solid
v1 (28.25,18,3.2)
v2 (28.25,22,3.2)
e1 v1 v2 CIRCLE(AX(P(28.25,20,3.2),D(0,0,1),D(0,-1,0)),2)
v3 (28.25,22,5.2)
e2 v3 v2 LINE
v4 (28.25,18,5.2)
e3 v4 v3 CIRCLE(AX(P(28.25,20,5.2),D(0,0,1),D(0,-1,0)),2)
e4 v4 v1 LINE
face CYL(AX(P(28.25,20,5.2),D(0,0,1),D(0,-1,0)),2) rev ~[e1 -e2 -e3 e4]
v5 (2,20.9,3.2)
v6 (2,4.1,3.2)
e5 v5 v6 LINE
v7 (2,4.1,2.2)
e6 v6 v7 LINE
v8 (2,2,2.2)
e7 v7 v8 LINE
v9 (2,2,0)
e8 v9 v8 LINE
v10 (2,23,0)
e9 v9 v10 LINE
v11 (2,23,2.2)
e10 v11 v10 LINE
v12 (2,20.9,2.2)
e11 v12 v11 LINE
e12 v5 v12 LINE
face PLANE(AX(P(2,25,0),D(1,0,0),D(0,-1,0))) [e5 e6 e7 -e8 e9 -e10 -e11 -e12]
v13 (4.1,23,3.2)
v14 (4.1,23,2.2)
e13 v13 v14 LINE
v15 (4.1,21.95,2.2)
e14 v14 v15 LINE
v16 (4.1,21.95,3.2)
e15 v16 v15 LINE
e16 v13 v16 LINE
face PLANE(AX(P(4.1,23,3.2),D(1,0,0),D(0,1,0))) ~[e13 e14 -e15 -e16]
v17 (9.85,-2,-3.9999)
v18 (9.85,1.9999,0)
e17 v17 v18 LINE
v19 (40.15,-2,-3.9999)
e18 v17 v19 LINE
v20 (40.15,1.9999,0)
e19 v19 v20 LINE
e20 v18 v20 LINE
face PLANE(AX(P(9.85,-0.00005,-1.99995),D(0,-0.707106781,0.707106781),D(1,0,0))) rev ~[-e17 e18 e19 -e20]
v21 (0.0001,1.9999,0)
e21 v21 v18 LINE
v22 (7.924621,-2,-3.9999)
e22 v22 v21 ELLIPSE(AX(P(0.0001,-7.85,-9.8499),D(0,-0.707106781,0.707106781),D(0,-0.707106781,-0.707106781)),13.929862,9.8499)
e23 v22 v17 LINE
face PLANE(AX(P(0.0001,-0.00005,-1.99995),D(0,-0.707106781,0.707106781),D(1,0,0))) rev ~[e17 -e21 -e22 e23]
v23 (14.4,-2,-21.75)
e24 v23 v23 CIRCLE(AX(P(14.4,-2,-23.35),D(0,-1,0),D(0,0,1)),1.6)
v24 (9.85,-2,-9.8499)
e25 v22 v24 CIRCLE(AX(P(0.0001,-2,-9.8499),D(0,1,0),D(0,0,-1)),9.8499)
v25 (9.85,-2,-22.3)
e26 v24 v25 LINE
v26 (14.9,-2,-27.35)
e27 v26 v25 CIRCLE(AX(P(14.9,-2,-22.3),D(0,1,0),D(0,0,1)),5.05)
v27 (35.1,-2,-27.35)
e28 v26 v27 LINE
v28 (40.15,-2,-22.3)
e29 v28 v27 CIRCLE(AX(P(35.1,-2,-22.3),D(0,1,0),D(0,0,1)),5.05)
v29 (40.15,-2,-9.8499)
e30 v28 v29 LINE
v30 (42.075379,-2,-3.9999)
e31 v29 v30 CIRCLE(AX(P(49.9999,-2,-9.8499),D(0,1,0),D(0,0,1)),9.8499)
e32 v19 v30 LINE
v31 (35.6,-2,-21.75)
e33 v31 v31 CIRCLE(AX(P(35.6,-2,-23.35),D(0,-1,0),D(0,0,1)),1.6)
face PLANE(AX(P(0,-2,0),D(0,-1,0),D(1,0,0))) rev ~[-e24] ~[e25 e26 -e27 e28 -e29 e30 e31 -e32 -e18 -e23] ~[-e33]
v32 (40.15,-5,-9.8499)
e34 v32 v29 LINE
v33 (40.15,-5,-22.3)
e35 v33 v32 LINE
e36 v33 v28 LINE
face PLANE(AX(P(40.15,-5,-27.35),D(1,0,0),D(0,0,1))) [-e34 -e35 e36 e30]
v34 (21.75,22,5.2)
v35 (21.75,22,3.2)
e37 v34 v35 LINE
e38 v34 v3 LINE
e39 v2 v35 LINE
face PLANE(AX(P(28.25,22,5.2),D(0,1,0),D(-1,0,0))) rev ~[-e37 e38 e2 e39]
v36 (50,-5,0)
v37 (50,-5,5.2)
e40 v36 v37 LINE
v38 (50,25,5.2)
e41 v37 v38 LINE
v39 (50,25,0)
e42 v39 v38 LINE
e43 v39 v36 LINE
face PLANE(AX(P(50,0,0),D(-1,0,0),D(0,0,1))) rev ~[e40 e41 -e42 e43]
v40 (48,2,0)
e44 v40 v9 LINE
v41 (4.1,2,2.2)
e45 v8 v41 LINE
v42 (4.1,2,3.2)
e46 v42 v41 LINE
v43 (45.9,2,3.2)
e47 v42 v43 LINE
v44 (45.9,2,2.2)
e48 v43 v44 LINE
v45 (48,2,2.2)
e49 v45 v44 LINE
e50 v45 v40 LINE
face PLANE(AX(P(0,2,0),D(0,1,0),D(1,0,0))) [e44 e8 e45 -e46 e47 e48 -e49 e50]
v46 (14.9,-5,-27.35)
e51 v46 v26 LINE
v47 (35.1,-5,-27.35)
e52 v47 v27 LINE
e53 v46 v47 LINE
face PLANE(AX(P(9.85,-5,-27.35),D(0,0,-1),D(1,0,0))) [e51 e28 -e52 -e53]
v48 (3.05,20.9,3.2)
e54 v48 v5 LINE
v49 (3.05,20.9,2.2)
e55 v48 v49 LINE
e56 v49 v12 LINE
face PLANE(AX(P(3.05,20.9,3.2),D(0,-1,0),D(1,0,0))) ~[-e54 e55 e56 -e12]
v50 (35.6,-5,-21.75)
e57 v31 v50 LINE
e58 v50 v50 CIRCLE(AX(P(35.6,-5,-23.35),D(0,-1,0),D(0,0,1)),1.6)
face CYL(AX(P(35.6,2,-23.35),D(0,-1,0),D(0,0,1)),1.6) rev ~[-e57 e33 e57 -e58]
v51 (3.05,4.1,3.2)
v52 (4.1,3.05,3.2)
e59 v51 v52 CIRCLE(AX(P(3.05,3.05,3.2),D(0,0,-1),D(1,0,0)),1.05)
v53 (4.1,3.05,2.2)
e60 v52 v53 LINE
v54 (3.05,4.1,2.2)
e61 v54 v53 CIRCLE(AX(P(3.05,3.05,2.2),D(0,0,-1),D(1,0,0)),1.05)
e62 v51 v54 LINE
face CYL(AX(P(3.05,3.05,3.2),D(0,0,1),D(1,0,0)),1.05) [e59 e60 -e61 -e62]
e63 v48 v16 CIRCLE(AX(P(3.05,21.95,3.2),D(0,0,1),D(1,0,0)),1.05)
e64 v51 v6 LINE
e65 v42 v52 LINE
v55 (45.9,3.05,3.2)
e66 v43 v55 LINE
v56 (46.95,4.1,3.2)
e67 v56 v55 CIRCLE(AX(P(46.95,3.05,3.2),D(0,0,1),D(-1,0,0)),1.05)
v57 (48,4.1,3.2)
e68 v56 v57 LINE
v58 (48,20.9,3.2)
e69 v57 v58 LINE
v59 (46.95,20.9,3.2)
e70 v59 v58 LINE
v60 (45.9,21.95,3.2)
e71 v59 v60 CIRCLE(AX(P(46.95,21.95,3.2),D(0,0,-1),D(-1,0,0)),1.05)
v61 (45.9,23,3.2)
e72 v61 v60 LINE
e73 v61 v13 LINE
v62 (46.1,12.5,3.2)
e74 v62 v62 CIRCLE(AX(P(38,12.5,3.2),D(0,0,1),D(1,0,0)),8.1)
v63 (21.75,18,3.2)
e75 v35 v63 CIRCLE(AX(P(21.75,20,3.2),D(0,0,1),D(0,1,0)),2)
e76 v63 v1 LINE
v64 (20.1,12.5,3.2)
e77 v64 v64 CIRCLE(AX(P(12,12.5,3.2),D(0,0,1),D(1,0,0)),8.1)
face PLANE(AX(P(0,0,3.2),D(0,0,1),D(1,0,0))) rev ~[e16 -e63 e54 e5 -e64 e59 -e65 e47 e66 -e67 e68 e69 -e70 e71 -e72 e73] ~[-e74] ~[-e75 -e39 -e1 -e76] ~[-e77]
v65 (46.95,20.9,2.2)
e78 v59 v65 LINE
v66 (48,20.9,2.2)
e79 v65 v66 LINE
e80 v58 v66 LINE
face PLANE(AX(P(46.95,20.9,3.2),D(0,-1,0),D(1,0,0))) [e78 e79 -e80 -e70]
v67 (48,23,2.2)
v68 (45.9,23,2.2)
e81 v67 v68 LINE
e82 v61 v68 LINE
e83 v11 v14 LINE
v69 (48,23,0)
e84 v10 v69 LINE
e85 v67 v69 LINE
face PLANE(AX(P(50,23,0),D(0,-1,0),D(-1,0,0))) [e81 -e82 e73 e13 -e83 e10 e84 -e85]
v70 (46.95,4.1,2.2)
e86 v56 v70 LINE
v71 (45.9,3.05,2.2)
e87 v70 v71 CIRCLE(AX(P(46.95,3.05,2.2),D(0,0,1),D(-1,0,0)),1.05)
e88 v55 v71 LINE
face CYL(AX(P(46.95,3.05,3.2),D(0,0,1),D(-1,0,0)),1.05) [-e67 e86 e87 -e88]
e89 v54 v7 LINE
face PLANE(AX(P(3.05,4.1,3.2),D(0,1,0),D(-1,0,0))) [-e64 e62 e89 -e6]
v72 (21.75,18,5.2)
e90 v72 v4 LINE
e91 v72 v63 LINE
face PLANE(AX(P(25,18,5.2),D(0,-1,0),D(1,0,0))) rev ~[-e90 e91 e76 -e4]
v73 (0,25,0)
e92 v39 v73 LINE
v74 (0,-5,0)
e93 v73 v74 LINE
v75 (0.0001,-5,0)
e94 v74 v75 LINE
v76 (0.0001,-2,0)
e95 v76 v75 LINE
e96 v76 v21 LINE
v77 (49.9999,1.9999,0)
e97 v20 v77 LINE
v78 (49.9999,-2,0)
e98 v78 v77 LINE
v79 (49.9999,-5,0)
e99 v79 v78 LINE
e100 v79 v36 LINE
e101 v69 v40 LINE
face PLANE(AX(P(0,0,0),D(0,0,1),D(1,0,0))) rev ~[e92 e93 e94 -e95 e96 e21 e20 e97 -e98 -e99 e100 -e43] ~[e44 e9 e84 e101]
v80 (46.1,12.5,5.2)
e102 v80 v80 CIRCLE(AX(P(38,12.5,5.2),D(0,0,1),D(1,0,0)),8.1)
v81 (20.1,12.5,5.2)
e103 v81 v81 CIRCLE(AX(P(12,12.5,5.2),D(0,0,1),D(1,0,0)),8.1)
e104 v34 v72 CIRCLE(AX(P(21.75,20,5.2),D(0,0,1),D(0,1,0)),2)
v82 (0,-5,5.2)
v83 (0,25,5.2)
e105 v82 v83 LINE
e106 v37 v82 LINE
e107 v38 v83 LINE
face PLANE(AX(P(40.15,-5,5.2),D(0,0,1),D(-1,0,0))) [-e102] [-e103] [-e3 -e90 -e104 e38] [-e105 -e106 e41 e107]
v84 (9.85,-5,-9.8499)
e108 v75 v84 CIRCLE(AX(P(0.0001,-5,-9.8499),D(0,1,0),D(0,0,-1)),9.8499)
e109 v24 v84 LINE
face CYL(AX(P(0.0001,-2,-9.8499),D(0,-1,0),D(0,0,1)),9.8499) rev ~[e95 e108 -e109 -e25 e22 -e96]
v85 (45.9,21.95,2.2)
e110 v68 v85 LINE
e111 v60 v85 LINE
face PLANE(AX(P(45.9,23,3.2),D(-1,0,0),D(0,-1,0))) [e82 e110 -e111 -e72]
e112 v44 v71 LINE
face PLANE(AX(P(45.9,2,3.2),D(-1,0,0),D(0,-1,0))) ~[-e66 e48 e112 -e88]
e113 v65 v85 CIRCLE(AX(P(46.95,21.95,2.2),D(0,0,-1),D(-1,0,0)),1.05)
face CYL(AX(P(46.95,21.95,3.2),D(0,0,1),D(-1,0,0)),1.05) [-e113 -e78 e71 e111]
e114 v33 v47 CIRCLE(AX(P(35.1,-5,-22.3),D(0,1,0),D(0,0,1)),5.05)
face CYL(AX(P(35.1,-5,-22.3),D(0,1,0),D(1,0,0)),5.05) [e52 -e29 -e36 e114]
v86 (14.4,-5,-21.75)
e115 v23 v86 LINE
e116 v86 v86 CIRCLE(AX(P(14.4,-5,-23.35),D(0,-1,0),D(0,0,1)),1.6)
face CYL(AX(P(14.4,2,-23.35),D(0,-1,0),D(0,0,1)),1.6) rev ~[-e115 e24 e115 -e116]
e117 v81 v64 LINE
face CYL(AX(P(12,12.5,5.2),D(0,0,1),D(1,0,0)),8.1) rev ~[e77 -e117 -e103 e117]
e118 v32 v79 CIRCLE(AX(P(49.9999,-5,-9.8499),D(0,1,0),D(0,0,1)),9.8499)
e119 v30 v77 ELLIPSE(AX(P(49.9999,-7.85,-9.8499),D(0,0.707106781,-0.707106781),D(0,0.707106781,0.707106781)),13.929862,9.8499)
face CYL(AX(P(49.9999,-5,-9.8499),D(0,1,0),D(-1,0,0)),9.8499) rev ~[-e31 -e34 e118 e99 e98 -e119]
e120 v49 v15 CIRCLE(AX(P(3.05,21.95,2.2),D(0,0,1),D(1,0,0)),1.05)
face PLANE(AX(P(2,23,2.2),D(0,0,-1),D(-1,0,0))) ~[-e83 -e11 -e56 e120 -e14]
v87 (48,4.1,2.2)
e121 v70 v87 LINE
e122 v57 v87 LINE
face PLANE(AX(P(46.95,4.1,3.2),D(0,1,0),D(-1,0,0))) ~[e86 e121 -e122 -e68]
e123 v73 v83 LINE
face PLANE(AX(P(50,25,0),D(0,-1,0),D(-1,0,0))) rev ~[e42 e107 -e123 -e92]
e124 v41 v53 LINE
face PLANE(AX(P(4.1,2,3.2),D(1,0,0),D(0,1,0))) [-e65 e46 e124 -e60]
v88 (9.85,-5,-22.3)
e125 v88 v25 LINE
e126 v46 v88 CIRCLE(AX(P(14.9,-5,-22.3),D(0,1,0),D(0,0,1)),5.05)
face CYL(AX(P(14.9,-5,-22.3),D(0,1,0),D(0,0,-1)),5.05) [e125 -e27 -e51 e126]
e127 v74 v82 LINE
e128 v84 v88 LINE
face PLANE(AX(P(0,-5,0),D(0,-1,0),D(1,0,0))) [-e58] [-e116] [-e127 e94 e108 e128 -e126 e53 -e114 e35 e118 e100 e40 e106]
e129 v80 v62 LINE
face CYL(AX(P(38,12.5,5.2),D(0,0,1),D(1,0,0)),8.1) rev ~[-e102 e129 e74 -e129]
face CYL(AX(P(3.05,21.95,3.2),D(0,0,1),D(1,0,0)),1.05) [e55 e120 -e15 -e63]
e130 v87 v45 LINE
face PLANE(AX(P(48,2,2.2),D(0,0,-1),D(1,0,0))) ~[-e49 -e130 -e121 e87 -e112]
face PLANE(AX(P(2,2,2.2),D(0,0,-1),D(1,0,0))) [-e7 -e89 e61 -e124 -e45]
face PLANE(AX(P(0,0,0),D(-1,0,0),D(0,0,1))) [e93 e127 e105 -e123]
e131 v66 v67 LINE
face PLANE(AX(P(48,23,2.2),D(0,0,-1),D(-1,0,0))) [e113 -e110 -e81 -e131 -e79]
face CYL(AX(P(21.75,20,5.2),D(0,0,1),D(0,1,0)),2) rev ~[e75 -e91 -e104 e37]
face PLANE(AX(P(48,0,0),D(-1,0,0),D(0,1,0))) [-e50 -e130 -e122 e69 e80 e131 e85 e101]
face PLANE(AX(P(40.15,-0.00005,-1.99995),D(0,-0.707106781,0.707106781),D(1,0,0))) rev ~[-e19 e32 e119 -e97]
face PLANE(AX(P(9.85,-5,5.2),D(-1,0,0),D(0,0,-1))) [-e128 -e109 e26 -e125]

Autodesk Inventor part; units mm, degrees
ref_plane "YZ Plane" through (0, 0, 0) normal (1, 0, 0) x (0, 1, 0)
sketch "Эскиз1" plane through (0, 0, 0) normal (0, 0, 1) x (1, 0, 0)
  line L0 (0, 0) -> (50, 0)
  line L1 (50, 0) -> (50, 25)
  line L2 (50, 25) -> (0, 25)
  line L3 (0, 25) -> (0, 0)
  dimension "d0" = 50
  dimension "d1" = 25
extrude "Выдавливание1" add sketch "Эскиз1" along normal blind 5.2
shell "Оболочка1" thickness 2 removed faces 1 at (16.6667, 16.6667, 0)
sketch "Эскиз2" plane through (0, 0, 5.2) normal (0, 0, 1) x (1, 0, 0)
  line L0 (50, 25) -> (0, 25) projected
  line L1 (25, 25) -> (25, 0)
  line L2 (0, 0) -> (50, 0) projected
  line L3 (25, 12.5) -> (12, 12.5)
  line L4 (0, 25) -> (0, 0) projected
  circle A0 centre (12, 12.5) radius 8.1
  circle A1 centre (38, 12.5) radius 8.1
  line L5 (25, 25) -> (25, 20)
  line L6 (21.75, 20) -> (28.25, 20) construction
  line L7 (21.75, 18) -> (28.25, 18)
  line L8 (28.25, 22) -> (21.75, 22)
  arc A2 (21.75, 22) -> (21.75, 18) centre (21.75, 20) ccw
  arc A3 (28.25, 18) -> (28.25, 22) centre (28.25, 20) ccw
  point P0 (25, 18)
  point P1 (25, 22)
  dimension "d5" = 13
  dimension "d6" = 16.2
  dimension "d9" = 5
  dimension "d10" = 3.25
  dimension "d11" = 4
extrude "Выдавливание2" cut sketch "Эскиз2" against normal through all contours L8 A3 L7 L1 | L1 L7 A2 L8 | A0 | A1
sketch "Эскиз5" plane through (48, 23, 3.2) normal (0, 0, -1) x (-1, 0, 0)
  line L0 (0, 0) -> (1.05, 0)
  line L1 (0, 0) -> (46, 0) projected
  line L2 (1.05, 0) -> (1.05, -1.05)
  circle A0 centre (1.05, -1.05) radius 1.05
  line L3 (2.1, -2.1) -> (0, -2.1)
  line L4 (0, -2.1) -> (0, 0)
  line L5 (0, 0) -> (2.1, 0)
  line L6 (2.1, 0) -> (2.1, -2.1)
  line L7 (2.1, -2.1) -> (0, 0) construction
  line L8 (0, -2.1) -> (2.1, 0) construction
  point P0 (48, -23)
  point P1 (1.05, -2.1)
  point P2 (2.1, -1.05)
  dimension "d17" = 1.05
  dimension "d18" = 1.05
extrude "Выдавливание4" add sketch "Эскиз5" along normal blind 1 contours L0 A0 L4 | L1 L6 A0 | A0 | A0 L3 L4
ref_plane "РабПлоскость1" through (25, 2, 0) normal (1, 0, 0) x (0, 0, -1)
ref_plane "РабПлоскость2" through (2, 12.5, 0) normal (0, -1, 0) x (1, 0, 0)
mirror "Зеркальное отражение1" about plane through (2, 12.5, 0) normal (0, -1, 0) of "Выдавливание4"
mirror "Зеркальное отражение2" about plane through (25, 2, 0) normal (1, 0, 0) of "Выдавливание4", "Зеркальное отражение1"
sketch "Эскиз19" plane through (0, 0, 0) normal (0, -1, 0) x (1, 0, 0)
  line L0 (0, 0) -> (50, 0) projected
  line L1 (50, 0) -> (50, 5.2) projected
  line L2 (0, 5.2) -> (50, 5.2) projected
  line L3 (0, 0) -> (0, 5.2) projected
extrude "Выдавливание14" add sketch "Эскиз19" along normal blind 5
sketch "Эскиз17" plane through (0, -5, 0) normal (0, -1, 0) x (1, 0, 0)
  line L0 (40.15, 5.2) -> (9.85, 5.2)
  line L1 (9.85, 5.2) -> (9.85, -27.35)
  line L2 (9.85, -27.35) -> (40.15, -27.35)
  line L3 (40.15, -27.35) -> (40.15, 5.2)
  line L4 (50, 5.2) -> (0, 5.2) projected
  point P0 (0, 0)
  point P1 (25, 5.2)
  dimension "d77" = 30.3
  dimension "d78" = 32.55
extrude "Выдавливание13" add sketch "Эскиз17" against normal blind 3
sketch "Эскиз18" plane through (45.9, 2, 2.2) normal (0, 1, 0) x (1, 0, 0)
  line L0 (-10.3, 25.55) -> (-31.5, 25.55)
  line L1 (-20.9, 25.55) -> (-20.9, 29.55)
  line L2 (-36.05, 29.55) -> (-5.75, 29.55) projected
  point P0 (-45.9, 2.2)
  dimension "d81" = 4
  dimension "d82" = 21.2
hole "Отверстие4" at (35.6, 2, -23.35) at (14.4, 2, -23.35) direction (0, -1, 0) diameter 3.2 end through all
fillet "Сопряжение4" radius 5.05 2 edges at (40.15, -3.5, -27.35) (9.85, -3.5, -27.35)
fillet "Сопряжение5" radius 9.85 2 edges at (40.15, -3.5, 0) (9.85, -3.5, 0)
chamfer "Фаска1" distance 4 angle 45 2 edges at (45.075, -2, 0) (4.9251, -2, 0)
properties part number "Крепление ультрасоника заднее"
